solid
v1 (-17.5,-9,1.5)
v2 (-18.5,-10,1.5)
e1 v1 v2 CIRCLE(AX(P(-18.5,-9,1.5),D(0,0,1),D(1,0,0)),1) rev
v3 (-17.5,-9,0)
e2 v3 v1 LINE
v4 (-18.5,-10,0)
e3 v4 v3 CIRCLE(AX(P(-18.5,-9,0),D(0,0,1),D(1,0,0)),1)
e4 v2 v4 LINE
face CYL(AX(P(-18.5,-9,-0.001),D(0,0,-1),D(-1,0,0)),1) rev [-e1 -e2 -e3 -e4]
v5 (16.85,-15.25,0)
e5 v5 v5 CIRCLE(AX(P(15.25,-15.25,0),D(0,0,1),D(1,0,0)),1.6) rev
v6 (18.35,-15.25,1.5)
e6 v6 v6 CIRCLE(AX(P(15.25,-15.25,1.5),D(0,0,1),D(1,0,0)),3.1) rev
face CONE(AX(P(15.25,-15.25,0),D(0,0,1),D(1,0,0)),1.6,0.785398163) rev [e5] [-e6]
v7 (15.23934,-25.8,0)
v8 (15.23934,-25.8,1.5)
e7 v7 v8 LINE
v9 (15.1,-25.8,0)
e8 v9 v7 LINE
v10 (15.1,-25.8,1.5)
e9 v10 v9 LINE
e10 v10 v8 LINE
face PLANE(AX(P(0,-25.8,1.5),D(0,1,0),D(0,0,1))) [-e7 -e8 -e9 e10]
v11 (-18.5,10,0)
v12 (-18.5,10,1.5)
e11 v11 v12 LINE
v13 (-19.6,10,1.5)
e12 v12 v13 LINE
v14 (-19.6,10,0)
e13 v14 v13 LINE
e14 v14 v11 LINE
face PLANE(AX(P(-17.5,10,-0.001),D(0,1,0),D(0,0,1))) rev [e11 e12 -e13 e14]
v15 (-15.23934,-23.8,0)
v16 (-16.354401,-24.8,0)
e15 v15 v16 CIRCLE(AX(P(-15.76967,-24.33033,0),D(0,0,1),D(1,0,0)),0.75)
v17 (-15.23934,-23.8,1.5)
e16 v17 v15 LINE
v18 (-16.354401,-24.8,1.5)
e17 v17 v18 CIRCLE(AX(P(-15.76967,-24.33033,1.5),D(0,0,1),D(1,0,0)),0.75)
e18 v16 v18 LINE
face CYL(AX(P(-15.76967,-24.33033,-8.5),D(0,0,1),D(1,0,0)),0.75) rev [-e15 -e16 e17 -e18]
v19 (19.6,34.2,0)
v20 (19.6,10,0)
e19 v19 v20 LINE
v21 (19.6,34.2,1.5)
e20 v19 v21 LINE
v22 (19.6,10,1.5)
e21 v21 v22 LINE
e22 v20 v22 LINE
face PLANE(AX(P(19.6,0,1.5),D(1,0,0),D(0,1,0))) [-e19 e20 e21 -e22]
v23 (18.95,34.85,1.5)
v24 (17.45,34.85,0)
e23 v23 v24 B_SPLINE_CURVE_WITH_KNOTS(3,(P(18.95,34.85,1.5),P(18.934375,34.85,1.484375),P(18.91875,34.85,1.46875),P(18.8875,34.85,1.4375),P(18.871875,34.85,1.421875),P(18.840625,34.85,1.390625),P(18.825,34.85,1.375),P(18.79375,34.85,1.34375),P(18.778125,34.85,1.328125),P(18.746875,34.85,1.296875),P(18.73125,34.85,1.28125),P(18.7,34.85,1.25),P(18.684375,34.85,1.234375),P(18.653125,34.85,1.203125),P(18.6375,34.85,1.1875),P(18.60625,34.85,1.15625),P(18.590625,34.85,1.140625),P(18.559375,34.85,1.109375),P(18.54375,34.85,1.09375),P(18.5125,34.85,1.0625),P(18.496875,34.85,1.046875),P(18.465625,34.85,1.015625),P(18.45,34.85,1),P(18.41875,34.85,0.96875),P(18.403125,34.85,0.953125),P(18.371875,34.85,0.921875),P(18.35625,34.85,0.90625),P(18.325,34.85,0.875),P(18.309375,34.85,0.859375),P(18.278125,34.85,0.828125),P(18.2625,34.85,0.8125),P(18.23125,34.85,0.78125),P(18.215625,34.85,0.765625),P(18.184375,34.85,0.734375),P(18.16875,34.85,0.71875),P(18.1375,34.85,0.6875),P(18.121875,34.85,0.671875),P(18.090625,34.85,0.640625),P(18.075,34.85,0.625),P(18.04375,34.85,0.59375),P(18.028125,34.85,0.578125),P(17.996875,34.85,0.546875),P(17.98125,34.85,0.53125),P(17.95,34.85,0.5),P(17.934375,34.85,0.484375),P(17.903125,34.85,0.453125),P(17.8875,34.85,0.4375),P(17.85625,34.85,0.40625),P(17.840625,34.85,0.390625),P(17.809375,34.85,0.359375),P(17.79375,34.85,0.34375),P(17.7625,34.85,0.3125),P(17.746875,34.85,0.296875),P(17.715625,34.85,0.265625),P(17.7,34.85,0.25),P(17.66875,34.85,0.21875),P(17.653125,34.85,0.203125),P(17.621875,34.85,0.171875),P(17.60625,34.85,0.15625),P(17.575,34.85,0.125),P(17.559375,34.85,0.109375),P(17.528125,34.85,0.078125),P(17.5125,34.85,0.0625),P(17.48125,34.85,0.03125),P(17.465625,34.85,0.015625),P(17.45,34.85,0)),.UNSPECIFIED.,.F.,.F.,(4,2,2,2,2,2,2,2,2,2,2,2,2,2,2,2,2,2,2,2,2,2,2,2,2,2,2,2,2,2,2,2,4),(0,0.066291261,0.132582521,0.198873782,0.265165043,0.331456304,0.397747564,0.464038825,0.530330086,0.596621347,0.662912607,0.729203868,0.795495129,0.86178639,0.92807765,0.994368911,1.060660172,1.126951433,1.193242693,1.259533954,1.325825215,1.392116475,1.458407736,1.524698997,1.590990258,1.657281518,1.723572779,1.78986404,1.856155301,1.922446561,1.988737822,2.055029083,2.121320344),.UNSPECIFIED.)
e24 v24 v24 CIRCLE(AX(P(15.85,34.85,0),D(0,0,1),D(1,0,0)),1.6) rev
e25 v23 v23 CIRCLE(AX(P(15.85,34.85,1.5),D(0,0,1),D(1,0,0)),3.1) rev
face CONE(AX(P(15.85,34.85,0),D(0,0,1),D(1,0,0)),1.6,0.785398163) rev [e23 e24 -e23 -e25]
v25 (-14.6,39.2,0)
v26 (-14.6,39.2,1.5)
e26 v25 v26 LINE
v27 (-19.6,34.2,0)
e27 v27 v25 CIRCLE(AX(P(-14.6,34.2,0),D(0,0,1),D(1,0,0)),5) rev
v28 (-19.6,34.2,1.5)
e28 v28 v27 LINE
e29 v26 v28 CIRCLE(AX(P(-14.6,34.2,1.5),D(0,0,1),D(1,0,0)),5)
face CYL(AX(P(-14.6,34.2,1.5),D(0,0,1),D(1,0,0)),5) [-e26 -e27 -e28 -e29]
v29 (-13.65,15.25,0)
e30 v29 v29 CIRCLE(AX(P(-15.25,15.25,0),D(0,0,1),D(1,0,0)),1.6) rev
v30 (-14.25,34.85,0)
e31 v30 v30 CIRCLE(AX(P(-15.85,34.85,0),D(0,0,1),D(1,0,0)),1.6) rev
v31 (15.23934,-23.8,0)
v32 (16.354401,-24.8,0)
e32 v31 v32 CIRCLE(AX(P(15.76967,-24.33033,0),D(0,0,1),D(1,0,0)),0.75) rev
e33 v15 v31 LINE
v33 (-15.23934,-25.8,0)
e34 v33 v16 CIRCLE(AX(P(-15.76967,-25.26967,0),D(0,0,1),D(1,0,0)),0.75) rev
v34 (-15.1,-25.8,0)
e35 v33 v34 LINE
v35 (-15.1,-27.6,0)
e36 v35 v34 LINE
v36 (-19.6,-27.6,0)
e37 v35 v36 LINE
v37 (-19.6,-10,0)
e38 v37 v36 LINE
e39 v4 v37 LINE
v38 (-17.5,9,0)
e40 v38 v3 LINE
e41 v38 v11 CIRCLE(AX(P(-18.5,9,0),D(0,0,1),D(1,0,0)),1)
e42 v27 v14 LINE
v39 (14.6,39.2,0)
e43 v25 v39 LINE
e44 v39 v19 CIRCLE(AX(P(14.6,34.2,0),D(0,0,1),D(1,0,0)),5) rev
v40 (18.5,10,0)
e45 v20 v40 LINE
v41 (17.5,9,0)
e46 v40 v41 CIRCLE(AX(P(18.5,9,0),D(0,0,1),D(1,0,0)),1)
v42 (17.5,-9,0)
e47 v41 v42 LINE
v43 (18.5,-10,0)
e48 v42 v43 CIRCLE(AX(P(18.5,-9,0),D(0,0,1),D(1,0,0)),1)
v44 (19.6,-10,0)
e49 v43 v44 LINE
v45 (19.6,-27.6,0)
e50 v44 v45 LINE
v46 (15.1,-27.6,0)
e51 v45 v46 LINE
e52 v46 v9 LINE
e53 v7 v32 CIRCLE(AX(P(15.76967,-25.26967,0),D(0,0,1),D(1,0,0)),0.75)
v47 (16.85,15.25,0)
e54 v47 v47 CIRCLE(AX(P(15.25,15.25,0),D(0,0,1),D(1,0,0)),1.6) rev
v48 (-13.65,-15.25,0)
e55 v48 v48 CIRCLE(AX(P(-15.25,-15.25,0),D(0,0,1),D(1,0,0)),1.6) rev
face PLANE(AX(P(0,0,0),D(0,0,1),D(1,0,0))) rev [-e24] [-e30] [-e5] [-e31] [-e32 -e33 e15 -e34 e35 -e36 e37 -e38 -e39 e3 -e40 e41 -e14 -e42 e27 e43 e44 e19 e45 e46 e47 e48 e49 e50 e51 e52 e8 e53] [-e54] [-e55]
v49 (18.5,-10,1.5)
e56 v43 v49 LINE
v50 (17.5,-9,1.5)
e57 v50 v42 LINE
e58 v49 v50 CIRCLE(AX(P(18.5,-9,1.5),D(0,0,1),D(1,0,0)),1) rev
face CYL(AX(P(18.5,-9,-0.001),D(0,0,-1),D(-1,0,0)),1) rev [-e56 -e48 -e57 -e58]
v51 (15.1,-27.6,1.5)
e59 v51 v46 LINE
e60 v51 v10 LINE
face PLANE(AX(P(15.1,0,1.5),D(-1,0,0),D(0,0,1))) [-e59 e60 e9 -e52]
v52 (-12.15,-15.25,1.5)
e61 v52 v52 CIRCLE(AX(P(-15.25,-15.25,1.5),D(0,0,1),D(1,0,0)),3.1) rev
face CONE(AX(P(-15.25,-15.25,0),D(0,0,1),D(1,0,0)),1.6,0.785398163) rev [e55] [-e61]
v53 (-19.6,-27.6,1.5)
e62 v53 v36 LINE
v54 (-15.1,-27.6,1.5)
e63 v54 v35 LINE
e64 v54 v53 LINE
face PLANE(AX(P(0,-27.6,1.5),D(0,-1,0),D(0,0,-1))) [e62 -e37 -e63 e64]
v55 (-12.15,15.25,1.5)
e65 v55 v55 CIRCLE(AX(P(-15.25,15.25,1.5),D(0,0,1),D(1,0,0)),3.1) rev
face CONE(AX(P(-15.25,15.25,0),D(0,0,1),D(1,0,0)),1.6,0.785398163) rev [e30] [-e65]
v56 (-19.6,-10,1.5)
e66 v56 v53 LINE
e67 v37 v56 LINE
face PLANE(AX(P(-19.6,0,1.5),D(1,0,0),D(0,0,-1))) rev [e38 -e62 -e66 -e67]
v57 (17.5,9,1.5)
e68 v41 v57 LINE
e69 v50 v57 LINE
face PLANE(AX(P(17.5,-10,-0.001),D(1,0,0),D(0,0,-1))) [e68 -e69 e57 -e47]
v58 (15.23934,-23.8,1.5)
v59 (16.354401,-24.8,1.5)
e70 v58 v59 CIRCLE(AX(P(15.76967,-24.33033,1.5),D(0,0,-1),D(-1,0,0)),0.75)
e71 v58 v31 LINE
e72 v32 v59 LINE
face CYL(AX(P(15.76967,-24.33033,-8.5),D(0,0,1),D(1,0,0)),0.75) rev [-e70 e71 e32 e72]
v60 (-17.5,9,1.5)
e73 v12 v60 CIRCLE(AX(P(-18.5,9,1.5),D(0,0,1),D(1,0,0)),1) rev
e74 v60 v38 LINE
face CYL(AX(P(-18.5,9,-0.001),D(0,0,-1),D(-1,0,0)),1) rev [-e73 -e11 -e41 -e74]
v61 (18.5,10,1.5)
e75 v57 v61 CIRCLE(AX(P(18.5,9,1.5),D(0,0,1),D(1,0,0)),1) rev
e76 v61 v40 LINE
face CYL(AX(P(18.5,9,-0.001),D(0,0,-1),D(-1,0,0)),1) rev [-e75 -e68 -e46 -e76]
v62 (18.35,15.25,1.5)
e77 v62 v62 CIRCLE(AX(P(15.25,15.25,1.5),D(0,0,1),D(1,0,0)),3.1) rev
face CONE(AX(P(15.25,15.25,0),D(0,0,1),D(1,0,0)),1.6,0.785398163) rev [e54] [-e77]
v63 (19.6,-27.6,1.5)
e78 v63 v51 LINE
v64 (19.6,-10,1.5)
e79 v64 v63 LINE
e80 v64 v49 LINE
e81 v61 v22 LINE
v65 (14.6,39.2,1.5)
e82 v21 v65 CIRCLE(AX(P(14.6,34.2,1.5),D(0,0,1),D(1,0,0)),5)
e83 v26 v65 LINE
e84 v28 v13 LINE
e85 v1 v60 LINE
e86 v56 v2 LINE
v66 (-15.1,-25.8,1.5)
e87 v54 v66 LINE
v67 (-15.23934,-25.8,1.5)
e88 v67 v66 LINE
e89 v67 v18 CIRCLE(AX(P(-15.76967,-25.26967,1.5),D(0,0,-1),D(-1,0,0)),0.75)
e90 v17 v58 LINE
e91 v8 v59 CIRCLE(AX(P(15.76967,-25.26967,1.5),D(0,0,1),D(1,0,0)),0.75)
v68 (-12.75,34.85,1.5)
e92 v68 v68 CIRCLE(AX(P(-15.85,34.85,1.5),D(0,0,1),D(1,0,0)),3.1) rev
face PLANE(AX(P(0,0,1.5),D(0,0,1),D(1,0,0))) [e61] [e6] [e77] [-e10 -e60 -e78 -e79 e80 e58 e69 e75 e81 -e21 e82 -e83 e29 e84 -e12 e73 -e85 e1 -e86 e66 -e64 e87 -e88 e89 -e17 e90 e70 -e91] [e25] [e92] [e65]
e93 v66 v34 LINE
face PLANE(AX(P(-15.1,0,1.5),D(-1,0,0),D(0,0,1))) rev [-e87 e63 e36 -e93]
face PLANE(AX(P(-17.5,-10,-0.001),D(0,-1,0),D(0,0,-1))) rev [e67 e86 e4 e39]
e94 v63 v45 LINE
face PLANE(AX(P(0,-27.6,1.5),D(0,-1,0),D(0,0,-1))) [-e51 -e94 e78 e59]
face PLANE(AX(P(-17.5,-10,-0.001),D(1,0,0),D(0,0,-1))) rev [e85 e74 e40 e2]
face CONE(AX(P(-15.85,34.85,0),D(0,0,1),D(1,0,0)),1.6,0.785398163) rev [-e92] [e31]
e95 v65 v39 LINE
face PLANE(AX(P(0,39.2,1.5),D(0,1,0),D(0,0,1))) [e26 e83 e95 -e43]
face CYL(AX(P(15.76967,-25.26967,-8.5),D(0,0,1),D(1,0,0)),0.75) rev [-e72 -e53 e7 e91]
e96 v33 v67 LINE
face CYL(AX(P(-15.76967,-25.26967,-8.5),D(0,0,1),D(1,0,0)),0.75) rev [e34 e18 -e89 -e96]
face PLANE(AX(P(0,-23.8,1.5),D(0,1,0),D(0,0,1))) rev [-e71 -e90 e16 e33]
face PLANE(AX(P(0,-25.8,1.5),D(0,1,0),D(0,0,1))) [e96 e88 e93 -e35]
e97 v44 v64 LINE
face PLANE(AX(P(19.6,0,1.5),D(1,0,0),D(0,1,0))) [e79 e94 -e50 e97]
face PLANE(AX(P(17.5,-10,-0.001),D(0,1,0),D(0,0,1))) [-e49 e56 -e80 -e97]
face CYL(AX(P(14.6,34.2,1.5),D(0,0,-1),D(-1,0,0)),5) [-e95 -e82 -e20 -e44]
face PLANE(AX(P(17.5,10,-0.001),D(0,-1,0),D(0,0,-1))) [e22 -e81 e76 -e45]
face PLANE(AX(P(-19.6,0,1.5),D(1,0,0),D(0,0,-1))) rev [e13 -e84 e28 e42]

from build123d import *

# Parameters (mm, degrees)
BASE_DEPTH                                 = 1.5
BATTERY_STRAP_CUT_REACH                    = 45.853
SKETCH3_W                                  = 2.1
SKETCH3_H                                  = 20
BATTERY_STRAP_FILLET_R                     = 1
BATTERY_STRAP_FILLET_OF_BATTERY_STRAP_OT_R = 1
FILLET2_R                                  = 5
HOLE_CUT_REACH                             = 45.853
SKETCH2_R                                  = 1.6
BOLT_HEAD_CHAMBER_SIZE                     = 1.5
SKETCH4_R                                  = 0.75
MILLING_HOLES_DEPTH                        = 10


with BuildPart() as part:
    # Sketch1 → Base (new body)
    with BuildSketch(Plane.XY):
        Polygon((-19.6, 39.2), (19.6, 39.2), (19.6, -27.6), (15.1, -27.6), (15.1, -25.8), (16.3, -25.8), (16.3, -23.8), (-16.3, -23.8), (-16.3, -25.8), (-15.1, -25.8), (-15.1, -27.6), (-19.6, -27.6), align=None)
    extrude(amount=BASE_DEPTH)

    # Sketch3 → Battery strap cut (cut, up to next)
    with BuildSketch(Plane.XY.offset(1.5), mode=Mode.PRIVATE) as battery_strap_cut_sk1:
        with Locations((-18.55, 0)):
            Rectangle(SKETCH3_W, SKETCH3_H)
    battery_strap_cut_tool1 = extrude(battery_strap_cut_sk1.sketch, amount=-BATTERY_STRAP_CUT_REACH, mode=Mode.PRIVATE) & part.part
    battery_strap_cut = battery_strap_cut_tool1.solids().sort_by_distance((-18.55, 0, 1.5))[0]
    add(battery_strap_cut, mode=Mode.SUBTRACT)

    # Battery strap fillet
    battery_strap_fillet_edges = [part.edges().sort_by_distance(p)[0] for p in [
        (-17.5, 10, 0.75),
        (-17.5, -10, 0.75),
    ]]
    fillet(battery_strap_fillet_edges, radius=BATTERY_STRAP_FILLET_R)

    # Battery strap other side: Battery strap cut across plane
    add(battery_strap_cut.mirror(Plane(origin=(0, 0, 0), x_dir=(0, 0, 1), z_dir=(1, 0, 0))), mode=Mode.SUBTRACT)

    # Battery strap fillet of Battery strap ot
    battery_strap_fillet_of_battery_strap_ot_edges = [part.edges().sort_by_distance(p)[0] for p in [
        (17.5, 10, 0.75),
        (17.5, -10, 0.75),
    ]]
    fillet(battery_strap_fillet_of_battery_strap_ot_edges, radius=BATTERY_STRAP_FILLET_OF_BATTERY_STRAP_OT_R)

    # Fillet2
    fillet2_edges = [part.edges().sort_by_distance(p)[0] for p in [
        (-19.6, 39.2, 0.75),
        (19.6, 39.2, 0.75),
    ]]
    fillet(fillet2_edges, radius=FILLET2_R)

    # Sketch2 → Hole cut (cut, up to next)
    with BuildSketch(Plane.XY.offset(1.5), mode=Mode.PRIVATE) as hole_cut_sk1:
        with Locations((-15.25, 15.25)):
            Circle(SKETCH2_R)
    hole_cut_tool1 = extrude(hole_cut_sk1.sketch, amount=-HOLE_CUT_REACH, mode=Mode.PRIVATE) & part.part
    # Sketch2 → Hole cut (cut, up to next)
    with BuildSketch(Plane.XY.offset(1.5), mode=Mode.PRIVATE) as hole_cut_sk2:
        with Locations((-15.85, 34.85)):
            Circle(SKETCH2_R)
    hole_cut_tool2 = extrude(hole_cut_sk2.sketch, amount=-HOLE_CUT_REACH, mode=Mode.PRIVATE) & part.part
    # Sketch2 → Hole cut (cut, up to next)
    with BuildSketch(Plane.XY.offset(1.5), mode=Mode.PRIVATE) as hole_cut_sk3:
        with Locations((15.85, 34.85)):
            Circle(SKETCH2_R)
    hole_cut_tool3 = extrude(hole_cut_sk3.sketch, amount=-HOLE_CUT_REACH, mode=Mode.PRIVATE) & part.part
    # Sketch2 → Hole cut (cut, up to next)
    with BuildSketch(Plane.XY.offset(1.5), mode=Mode.PRIVATE) as hole_cut_sk4:
        with Locations((15.25, 15.25)):
            Circle(SKETCH2_R)
    hole_cut_tool4 = extrude(hole_cut_sk4.sketch, amount=-HOLE_CUT_REACH, mode=Mode.PRIVATE) & part.part
    # Sketch2 → Hole cut (cut, up to next)
    with BuildSketch(Plane.XY.offset(1.5), mode=Mode.PRIVATE) as hole_cut_sk5:
        with Locations((15.25, -15.25)):
            Circle(SKETCH2_R)
    hole_cut_tool5 = extrude(hole_cut_sk5.sketch, amount=-HOLE_CUT_REACH, mode=Mode.PRIVATE) & part.part
    # Sketch2 → Hole cut (cut, up to next)
    with BuildSketch(Plane.XY.offset(1.5), mode=Mode.PRIVATE) as hole_cut_sk6:
        with Locations((-15.25, -15.25)):
            Circle(SKETCH2_R)
    hole_cut_tool6 = extrude(hole_cut_sk6.sketch, amount=-HOLE_CUT_REACH, mode=Mode.PRIVATE) & part.part
    add(hole_cut_tool1.solids().sort_by_distance((-15.25, 15.25, 1.5))[0], mode=Mode.SUBTRACT)
    add(hole_cut_tool2.solids().sort_by_distance((-15.85, 34.85, 1.5))[0], mode=Mode.SUBTRACT)
    add(hole_cut_tool3.solids().sort_by_distance((15.85, 34.85, 1.5))[0], mode=Mode.SUBTRACT)
    add(hole_cut_tool4.solids().sort_by_distance((15.25, 15.25, 1.5))[0], mode=Mode.SUBTRACT)
    add(hole_cut_tool5.solids().sort_by_distance((15.25, -15.25, 1.5))[0], mode=Mode.SUBTRACT)
    add(hole_cut_tool6.solids().sort_by_distance((-15.25, -15.25, 1.5))[0], mode=Mode.SUBTRACT)

    # Bolt head chamber
    bolt_head_chamber_edges = [part.edges().sort_by_distance(p)[0] for p in [
        (-16.85, 15.25, 1.5),
        (-17.45, 34.85, 1.5),
        (14.25, 34.85, 1.5),
        (13.65, 15.25, 1.5),
        (13.65, -15.25, 1.5),
        (-16.85, -15.25, 1.5),
    ]]
    chamfer(bolt_head_chamber_edges, length=BOLT_HEAD_CHAMBER_SIZE - 0.0001)  # a hair under: the kernel refuses the full size

    # Sketch4 → Milling holes (cut)
    with BuildSketch(Plane.XY.offset(1.5)):
        with Locations((-15.769669914, -24.330330086)):
            Circle(SKETCH4_R)
        with Locations((-15.769669914, -25.269669914)):
            Circle(SKETCH4_R)
        with Locations((15.769669914, -25.269669914)):
            Circle(SKETCH4_R)
        with Locations((15.769669914, -24.330330086)):
            Circle(SKETCH4_R)
    extrude(amount=-MILLING_HOLES_DEPTH, mode=Mode.SUBTRACT)


solid = part.part
